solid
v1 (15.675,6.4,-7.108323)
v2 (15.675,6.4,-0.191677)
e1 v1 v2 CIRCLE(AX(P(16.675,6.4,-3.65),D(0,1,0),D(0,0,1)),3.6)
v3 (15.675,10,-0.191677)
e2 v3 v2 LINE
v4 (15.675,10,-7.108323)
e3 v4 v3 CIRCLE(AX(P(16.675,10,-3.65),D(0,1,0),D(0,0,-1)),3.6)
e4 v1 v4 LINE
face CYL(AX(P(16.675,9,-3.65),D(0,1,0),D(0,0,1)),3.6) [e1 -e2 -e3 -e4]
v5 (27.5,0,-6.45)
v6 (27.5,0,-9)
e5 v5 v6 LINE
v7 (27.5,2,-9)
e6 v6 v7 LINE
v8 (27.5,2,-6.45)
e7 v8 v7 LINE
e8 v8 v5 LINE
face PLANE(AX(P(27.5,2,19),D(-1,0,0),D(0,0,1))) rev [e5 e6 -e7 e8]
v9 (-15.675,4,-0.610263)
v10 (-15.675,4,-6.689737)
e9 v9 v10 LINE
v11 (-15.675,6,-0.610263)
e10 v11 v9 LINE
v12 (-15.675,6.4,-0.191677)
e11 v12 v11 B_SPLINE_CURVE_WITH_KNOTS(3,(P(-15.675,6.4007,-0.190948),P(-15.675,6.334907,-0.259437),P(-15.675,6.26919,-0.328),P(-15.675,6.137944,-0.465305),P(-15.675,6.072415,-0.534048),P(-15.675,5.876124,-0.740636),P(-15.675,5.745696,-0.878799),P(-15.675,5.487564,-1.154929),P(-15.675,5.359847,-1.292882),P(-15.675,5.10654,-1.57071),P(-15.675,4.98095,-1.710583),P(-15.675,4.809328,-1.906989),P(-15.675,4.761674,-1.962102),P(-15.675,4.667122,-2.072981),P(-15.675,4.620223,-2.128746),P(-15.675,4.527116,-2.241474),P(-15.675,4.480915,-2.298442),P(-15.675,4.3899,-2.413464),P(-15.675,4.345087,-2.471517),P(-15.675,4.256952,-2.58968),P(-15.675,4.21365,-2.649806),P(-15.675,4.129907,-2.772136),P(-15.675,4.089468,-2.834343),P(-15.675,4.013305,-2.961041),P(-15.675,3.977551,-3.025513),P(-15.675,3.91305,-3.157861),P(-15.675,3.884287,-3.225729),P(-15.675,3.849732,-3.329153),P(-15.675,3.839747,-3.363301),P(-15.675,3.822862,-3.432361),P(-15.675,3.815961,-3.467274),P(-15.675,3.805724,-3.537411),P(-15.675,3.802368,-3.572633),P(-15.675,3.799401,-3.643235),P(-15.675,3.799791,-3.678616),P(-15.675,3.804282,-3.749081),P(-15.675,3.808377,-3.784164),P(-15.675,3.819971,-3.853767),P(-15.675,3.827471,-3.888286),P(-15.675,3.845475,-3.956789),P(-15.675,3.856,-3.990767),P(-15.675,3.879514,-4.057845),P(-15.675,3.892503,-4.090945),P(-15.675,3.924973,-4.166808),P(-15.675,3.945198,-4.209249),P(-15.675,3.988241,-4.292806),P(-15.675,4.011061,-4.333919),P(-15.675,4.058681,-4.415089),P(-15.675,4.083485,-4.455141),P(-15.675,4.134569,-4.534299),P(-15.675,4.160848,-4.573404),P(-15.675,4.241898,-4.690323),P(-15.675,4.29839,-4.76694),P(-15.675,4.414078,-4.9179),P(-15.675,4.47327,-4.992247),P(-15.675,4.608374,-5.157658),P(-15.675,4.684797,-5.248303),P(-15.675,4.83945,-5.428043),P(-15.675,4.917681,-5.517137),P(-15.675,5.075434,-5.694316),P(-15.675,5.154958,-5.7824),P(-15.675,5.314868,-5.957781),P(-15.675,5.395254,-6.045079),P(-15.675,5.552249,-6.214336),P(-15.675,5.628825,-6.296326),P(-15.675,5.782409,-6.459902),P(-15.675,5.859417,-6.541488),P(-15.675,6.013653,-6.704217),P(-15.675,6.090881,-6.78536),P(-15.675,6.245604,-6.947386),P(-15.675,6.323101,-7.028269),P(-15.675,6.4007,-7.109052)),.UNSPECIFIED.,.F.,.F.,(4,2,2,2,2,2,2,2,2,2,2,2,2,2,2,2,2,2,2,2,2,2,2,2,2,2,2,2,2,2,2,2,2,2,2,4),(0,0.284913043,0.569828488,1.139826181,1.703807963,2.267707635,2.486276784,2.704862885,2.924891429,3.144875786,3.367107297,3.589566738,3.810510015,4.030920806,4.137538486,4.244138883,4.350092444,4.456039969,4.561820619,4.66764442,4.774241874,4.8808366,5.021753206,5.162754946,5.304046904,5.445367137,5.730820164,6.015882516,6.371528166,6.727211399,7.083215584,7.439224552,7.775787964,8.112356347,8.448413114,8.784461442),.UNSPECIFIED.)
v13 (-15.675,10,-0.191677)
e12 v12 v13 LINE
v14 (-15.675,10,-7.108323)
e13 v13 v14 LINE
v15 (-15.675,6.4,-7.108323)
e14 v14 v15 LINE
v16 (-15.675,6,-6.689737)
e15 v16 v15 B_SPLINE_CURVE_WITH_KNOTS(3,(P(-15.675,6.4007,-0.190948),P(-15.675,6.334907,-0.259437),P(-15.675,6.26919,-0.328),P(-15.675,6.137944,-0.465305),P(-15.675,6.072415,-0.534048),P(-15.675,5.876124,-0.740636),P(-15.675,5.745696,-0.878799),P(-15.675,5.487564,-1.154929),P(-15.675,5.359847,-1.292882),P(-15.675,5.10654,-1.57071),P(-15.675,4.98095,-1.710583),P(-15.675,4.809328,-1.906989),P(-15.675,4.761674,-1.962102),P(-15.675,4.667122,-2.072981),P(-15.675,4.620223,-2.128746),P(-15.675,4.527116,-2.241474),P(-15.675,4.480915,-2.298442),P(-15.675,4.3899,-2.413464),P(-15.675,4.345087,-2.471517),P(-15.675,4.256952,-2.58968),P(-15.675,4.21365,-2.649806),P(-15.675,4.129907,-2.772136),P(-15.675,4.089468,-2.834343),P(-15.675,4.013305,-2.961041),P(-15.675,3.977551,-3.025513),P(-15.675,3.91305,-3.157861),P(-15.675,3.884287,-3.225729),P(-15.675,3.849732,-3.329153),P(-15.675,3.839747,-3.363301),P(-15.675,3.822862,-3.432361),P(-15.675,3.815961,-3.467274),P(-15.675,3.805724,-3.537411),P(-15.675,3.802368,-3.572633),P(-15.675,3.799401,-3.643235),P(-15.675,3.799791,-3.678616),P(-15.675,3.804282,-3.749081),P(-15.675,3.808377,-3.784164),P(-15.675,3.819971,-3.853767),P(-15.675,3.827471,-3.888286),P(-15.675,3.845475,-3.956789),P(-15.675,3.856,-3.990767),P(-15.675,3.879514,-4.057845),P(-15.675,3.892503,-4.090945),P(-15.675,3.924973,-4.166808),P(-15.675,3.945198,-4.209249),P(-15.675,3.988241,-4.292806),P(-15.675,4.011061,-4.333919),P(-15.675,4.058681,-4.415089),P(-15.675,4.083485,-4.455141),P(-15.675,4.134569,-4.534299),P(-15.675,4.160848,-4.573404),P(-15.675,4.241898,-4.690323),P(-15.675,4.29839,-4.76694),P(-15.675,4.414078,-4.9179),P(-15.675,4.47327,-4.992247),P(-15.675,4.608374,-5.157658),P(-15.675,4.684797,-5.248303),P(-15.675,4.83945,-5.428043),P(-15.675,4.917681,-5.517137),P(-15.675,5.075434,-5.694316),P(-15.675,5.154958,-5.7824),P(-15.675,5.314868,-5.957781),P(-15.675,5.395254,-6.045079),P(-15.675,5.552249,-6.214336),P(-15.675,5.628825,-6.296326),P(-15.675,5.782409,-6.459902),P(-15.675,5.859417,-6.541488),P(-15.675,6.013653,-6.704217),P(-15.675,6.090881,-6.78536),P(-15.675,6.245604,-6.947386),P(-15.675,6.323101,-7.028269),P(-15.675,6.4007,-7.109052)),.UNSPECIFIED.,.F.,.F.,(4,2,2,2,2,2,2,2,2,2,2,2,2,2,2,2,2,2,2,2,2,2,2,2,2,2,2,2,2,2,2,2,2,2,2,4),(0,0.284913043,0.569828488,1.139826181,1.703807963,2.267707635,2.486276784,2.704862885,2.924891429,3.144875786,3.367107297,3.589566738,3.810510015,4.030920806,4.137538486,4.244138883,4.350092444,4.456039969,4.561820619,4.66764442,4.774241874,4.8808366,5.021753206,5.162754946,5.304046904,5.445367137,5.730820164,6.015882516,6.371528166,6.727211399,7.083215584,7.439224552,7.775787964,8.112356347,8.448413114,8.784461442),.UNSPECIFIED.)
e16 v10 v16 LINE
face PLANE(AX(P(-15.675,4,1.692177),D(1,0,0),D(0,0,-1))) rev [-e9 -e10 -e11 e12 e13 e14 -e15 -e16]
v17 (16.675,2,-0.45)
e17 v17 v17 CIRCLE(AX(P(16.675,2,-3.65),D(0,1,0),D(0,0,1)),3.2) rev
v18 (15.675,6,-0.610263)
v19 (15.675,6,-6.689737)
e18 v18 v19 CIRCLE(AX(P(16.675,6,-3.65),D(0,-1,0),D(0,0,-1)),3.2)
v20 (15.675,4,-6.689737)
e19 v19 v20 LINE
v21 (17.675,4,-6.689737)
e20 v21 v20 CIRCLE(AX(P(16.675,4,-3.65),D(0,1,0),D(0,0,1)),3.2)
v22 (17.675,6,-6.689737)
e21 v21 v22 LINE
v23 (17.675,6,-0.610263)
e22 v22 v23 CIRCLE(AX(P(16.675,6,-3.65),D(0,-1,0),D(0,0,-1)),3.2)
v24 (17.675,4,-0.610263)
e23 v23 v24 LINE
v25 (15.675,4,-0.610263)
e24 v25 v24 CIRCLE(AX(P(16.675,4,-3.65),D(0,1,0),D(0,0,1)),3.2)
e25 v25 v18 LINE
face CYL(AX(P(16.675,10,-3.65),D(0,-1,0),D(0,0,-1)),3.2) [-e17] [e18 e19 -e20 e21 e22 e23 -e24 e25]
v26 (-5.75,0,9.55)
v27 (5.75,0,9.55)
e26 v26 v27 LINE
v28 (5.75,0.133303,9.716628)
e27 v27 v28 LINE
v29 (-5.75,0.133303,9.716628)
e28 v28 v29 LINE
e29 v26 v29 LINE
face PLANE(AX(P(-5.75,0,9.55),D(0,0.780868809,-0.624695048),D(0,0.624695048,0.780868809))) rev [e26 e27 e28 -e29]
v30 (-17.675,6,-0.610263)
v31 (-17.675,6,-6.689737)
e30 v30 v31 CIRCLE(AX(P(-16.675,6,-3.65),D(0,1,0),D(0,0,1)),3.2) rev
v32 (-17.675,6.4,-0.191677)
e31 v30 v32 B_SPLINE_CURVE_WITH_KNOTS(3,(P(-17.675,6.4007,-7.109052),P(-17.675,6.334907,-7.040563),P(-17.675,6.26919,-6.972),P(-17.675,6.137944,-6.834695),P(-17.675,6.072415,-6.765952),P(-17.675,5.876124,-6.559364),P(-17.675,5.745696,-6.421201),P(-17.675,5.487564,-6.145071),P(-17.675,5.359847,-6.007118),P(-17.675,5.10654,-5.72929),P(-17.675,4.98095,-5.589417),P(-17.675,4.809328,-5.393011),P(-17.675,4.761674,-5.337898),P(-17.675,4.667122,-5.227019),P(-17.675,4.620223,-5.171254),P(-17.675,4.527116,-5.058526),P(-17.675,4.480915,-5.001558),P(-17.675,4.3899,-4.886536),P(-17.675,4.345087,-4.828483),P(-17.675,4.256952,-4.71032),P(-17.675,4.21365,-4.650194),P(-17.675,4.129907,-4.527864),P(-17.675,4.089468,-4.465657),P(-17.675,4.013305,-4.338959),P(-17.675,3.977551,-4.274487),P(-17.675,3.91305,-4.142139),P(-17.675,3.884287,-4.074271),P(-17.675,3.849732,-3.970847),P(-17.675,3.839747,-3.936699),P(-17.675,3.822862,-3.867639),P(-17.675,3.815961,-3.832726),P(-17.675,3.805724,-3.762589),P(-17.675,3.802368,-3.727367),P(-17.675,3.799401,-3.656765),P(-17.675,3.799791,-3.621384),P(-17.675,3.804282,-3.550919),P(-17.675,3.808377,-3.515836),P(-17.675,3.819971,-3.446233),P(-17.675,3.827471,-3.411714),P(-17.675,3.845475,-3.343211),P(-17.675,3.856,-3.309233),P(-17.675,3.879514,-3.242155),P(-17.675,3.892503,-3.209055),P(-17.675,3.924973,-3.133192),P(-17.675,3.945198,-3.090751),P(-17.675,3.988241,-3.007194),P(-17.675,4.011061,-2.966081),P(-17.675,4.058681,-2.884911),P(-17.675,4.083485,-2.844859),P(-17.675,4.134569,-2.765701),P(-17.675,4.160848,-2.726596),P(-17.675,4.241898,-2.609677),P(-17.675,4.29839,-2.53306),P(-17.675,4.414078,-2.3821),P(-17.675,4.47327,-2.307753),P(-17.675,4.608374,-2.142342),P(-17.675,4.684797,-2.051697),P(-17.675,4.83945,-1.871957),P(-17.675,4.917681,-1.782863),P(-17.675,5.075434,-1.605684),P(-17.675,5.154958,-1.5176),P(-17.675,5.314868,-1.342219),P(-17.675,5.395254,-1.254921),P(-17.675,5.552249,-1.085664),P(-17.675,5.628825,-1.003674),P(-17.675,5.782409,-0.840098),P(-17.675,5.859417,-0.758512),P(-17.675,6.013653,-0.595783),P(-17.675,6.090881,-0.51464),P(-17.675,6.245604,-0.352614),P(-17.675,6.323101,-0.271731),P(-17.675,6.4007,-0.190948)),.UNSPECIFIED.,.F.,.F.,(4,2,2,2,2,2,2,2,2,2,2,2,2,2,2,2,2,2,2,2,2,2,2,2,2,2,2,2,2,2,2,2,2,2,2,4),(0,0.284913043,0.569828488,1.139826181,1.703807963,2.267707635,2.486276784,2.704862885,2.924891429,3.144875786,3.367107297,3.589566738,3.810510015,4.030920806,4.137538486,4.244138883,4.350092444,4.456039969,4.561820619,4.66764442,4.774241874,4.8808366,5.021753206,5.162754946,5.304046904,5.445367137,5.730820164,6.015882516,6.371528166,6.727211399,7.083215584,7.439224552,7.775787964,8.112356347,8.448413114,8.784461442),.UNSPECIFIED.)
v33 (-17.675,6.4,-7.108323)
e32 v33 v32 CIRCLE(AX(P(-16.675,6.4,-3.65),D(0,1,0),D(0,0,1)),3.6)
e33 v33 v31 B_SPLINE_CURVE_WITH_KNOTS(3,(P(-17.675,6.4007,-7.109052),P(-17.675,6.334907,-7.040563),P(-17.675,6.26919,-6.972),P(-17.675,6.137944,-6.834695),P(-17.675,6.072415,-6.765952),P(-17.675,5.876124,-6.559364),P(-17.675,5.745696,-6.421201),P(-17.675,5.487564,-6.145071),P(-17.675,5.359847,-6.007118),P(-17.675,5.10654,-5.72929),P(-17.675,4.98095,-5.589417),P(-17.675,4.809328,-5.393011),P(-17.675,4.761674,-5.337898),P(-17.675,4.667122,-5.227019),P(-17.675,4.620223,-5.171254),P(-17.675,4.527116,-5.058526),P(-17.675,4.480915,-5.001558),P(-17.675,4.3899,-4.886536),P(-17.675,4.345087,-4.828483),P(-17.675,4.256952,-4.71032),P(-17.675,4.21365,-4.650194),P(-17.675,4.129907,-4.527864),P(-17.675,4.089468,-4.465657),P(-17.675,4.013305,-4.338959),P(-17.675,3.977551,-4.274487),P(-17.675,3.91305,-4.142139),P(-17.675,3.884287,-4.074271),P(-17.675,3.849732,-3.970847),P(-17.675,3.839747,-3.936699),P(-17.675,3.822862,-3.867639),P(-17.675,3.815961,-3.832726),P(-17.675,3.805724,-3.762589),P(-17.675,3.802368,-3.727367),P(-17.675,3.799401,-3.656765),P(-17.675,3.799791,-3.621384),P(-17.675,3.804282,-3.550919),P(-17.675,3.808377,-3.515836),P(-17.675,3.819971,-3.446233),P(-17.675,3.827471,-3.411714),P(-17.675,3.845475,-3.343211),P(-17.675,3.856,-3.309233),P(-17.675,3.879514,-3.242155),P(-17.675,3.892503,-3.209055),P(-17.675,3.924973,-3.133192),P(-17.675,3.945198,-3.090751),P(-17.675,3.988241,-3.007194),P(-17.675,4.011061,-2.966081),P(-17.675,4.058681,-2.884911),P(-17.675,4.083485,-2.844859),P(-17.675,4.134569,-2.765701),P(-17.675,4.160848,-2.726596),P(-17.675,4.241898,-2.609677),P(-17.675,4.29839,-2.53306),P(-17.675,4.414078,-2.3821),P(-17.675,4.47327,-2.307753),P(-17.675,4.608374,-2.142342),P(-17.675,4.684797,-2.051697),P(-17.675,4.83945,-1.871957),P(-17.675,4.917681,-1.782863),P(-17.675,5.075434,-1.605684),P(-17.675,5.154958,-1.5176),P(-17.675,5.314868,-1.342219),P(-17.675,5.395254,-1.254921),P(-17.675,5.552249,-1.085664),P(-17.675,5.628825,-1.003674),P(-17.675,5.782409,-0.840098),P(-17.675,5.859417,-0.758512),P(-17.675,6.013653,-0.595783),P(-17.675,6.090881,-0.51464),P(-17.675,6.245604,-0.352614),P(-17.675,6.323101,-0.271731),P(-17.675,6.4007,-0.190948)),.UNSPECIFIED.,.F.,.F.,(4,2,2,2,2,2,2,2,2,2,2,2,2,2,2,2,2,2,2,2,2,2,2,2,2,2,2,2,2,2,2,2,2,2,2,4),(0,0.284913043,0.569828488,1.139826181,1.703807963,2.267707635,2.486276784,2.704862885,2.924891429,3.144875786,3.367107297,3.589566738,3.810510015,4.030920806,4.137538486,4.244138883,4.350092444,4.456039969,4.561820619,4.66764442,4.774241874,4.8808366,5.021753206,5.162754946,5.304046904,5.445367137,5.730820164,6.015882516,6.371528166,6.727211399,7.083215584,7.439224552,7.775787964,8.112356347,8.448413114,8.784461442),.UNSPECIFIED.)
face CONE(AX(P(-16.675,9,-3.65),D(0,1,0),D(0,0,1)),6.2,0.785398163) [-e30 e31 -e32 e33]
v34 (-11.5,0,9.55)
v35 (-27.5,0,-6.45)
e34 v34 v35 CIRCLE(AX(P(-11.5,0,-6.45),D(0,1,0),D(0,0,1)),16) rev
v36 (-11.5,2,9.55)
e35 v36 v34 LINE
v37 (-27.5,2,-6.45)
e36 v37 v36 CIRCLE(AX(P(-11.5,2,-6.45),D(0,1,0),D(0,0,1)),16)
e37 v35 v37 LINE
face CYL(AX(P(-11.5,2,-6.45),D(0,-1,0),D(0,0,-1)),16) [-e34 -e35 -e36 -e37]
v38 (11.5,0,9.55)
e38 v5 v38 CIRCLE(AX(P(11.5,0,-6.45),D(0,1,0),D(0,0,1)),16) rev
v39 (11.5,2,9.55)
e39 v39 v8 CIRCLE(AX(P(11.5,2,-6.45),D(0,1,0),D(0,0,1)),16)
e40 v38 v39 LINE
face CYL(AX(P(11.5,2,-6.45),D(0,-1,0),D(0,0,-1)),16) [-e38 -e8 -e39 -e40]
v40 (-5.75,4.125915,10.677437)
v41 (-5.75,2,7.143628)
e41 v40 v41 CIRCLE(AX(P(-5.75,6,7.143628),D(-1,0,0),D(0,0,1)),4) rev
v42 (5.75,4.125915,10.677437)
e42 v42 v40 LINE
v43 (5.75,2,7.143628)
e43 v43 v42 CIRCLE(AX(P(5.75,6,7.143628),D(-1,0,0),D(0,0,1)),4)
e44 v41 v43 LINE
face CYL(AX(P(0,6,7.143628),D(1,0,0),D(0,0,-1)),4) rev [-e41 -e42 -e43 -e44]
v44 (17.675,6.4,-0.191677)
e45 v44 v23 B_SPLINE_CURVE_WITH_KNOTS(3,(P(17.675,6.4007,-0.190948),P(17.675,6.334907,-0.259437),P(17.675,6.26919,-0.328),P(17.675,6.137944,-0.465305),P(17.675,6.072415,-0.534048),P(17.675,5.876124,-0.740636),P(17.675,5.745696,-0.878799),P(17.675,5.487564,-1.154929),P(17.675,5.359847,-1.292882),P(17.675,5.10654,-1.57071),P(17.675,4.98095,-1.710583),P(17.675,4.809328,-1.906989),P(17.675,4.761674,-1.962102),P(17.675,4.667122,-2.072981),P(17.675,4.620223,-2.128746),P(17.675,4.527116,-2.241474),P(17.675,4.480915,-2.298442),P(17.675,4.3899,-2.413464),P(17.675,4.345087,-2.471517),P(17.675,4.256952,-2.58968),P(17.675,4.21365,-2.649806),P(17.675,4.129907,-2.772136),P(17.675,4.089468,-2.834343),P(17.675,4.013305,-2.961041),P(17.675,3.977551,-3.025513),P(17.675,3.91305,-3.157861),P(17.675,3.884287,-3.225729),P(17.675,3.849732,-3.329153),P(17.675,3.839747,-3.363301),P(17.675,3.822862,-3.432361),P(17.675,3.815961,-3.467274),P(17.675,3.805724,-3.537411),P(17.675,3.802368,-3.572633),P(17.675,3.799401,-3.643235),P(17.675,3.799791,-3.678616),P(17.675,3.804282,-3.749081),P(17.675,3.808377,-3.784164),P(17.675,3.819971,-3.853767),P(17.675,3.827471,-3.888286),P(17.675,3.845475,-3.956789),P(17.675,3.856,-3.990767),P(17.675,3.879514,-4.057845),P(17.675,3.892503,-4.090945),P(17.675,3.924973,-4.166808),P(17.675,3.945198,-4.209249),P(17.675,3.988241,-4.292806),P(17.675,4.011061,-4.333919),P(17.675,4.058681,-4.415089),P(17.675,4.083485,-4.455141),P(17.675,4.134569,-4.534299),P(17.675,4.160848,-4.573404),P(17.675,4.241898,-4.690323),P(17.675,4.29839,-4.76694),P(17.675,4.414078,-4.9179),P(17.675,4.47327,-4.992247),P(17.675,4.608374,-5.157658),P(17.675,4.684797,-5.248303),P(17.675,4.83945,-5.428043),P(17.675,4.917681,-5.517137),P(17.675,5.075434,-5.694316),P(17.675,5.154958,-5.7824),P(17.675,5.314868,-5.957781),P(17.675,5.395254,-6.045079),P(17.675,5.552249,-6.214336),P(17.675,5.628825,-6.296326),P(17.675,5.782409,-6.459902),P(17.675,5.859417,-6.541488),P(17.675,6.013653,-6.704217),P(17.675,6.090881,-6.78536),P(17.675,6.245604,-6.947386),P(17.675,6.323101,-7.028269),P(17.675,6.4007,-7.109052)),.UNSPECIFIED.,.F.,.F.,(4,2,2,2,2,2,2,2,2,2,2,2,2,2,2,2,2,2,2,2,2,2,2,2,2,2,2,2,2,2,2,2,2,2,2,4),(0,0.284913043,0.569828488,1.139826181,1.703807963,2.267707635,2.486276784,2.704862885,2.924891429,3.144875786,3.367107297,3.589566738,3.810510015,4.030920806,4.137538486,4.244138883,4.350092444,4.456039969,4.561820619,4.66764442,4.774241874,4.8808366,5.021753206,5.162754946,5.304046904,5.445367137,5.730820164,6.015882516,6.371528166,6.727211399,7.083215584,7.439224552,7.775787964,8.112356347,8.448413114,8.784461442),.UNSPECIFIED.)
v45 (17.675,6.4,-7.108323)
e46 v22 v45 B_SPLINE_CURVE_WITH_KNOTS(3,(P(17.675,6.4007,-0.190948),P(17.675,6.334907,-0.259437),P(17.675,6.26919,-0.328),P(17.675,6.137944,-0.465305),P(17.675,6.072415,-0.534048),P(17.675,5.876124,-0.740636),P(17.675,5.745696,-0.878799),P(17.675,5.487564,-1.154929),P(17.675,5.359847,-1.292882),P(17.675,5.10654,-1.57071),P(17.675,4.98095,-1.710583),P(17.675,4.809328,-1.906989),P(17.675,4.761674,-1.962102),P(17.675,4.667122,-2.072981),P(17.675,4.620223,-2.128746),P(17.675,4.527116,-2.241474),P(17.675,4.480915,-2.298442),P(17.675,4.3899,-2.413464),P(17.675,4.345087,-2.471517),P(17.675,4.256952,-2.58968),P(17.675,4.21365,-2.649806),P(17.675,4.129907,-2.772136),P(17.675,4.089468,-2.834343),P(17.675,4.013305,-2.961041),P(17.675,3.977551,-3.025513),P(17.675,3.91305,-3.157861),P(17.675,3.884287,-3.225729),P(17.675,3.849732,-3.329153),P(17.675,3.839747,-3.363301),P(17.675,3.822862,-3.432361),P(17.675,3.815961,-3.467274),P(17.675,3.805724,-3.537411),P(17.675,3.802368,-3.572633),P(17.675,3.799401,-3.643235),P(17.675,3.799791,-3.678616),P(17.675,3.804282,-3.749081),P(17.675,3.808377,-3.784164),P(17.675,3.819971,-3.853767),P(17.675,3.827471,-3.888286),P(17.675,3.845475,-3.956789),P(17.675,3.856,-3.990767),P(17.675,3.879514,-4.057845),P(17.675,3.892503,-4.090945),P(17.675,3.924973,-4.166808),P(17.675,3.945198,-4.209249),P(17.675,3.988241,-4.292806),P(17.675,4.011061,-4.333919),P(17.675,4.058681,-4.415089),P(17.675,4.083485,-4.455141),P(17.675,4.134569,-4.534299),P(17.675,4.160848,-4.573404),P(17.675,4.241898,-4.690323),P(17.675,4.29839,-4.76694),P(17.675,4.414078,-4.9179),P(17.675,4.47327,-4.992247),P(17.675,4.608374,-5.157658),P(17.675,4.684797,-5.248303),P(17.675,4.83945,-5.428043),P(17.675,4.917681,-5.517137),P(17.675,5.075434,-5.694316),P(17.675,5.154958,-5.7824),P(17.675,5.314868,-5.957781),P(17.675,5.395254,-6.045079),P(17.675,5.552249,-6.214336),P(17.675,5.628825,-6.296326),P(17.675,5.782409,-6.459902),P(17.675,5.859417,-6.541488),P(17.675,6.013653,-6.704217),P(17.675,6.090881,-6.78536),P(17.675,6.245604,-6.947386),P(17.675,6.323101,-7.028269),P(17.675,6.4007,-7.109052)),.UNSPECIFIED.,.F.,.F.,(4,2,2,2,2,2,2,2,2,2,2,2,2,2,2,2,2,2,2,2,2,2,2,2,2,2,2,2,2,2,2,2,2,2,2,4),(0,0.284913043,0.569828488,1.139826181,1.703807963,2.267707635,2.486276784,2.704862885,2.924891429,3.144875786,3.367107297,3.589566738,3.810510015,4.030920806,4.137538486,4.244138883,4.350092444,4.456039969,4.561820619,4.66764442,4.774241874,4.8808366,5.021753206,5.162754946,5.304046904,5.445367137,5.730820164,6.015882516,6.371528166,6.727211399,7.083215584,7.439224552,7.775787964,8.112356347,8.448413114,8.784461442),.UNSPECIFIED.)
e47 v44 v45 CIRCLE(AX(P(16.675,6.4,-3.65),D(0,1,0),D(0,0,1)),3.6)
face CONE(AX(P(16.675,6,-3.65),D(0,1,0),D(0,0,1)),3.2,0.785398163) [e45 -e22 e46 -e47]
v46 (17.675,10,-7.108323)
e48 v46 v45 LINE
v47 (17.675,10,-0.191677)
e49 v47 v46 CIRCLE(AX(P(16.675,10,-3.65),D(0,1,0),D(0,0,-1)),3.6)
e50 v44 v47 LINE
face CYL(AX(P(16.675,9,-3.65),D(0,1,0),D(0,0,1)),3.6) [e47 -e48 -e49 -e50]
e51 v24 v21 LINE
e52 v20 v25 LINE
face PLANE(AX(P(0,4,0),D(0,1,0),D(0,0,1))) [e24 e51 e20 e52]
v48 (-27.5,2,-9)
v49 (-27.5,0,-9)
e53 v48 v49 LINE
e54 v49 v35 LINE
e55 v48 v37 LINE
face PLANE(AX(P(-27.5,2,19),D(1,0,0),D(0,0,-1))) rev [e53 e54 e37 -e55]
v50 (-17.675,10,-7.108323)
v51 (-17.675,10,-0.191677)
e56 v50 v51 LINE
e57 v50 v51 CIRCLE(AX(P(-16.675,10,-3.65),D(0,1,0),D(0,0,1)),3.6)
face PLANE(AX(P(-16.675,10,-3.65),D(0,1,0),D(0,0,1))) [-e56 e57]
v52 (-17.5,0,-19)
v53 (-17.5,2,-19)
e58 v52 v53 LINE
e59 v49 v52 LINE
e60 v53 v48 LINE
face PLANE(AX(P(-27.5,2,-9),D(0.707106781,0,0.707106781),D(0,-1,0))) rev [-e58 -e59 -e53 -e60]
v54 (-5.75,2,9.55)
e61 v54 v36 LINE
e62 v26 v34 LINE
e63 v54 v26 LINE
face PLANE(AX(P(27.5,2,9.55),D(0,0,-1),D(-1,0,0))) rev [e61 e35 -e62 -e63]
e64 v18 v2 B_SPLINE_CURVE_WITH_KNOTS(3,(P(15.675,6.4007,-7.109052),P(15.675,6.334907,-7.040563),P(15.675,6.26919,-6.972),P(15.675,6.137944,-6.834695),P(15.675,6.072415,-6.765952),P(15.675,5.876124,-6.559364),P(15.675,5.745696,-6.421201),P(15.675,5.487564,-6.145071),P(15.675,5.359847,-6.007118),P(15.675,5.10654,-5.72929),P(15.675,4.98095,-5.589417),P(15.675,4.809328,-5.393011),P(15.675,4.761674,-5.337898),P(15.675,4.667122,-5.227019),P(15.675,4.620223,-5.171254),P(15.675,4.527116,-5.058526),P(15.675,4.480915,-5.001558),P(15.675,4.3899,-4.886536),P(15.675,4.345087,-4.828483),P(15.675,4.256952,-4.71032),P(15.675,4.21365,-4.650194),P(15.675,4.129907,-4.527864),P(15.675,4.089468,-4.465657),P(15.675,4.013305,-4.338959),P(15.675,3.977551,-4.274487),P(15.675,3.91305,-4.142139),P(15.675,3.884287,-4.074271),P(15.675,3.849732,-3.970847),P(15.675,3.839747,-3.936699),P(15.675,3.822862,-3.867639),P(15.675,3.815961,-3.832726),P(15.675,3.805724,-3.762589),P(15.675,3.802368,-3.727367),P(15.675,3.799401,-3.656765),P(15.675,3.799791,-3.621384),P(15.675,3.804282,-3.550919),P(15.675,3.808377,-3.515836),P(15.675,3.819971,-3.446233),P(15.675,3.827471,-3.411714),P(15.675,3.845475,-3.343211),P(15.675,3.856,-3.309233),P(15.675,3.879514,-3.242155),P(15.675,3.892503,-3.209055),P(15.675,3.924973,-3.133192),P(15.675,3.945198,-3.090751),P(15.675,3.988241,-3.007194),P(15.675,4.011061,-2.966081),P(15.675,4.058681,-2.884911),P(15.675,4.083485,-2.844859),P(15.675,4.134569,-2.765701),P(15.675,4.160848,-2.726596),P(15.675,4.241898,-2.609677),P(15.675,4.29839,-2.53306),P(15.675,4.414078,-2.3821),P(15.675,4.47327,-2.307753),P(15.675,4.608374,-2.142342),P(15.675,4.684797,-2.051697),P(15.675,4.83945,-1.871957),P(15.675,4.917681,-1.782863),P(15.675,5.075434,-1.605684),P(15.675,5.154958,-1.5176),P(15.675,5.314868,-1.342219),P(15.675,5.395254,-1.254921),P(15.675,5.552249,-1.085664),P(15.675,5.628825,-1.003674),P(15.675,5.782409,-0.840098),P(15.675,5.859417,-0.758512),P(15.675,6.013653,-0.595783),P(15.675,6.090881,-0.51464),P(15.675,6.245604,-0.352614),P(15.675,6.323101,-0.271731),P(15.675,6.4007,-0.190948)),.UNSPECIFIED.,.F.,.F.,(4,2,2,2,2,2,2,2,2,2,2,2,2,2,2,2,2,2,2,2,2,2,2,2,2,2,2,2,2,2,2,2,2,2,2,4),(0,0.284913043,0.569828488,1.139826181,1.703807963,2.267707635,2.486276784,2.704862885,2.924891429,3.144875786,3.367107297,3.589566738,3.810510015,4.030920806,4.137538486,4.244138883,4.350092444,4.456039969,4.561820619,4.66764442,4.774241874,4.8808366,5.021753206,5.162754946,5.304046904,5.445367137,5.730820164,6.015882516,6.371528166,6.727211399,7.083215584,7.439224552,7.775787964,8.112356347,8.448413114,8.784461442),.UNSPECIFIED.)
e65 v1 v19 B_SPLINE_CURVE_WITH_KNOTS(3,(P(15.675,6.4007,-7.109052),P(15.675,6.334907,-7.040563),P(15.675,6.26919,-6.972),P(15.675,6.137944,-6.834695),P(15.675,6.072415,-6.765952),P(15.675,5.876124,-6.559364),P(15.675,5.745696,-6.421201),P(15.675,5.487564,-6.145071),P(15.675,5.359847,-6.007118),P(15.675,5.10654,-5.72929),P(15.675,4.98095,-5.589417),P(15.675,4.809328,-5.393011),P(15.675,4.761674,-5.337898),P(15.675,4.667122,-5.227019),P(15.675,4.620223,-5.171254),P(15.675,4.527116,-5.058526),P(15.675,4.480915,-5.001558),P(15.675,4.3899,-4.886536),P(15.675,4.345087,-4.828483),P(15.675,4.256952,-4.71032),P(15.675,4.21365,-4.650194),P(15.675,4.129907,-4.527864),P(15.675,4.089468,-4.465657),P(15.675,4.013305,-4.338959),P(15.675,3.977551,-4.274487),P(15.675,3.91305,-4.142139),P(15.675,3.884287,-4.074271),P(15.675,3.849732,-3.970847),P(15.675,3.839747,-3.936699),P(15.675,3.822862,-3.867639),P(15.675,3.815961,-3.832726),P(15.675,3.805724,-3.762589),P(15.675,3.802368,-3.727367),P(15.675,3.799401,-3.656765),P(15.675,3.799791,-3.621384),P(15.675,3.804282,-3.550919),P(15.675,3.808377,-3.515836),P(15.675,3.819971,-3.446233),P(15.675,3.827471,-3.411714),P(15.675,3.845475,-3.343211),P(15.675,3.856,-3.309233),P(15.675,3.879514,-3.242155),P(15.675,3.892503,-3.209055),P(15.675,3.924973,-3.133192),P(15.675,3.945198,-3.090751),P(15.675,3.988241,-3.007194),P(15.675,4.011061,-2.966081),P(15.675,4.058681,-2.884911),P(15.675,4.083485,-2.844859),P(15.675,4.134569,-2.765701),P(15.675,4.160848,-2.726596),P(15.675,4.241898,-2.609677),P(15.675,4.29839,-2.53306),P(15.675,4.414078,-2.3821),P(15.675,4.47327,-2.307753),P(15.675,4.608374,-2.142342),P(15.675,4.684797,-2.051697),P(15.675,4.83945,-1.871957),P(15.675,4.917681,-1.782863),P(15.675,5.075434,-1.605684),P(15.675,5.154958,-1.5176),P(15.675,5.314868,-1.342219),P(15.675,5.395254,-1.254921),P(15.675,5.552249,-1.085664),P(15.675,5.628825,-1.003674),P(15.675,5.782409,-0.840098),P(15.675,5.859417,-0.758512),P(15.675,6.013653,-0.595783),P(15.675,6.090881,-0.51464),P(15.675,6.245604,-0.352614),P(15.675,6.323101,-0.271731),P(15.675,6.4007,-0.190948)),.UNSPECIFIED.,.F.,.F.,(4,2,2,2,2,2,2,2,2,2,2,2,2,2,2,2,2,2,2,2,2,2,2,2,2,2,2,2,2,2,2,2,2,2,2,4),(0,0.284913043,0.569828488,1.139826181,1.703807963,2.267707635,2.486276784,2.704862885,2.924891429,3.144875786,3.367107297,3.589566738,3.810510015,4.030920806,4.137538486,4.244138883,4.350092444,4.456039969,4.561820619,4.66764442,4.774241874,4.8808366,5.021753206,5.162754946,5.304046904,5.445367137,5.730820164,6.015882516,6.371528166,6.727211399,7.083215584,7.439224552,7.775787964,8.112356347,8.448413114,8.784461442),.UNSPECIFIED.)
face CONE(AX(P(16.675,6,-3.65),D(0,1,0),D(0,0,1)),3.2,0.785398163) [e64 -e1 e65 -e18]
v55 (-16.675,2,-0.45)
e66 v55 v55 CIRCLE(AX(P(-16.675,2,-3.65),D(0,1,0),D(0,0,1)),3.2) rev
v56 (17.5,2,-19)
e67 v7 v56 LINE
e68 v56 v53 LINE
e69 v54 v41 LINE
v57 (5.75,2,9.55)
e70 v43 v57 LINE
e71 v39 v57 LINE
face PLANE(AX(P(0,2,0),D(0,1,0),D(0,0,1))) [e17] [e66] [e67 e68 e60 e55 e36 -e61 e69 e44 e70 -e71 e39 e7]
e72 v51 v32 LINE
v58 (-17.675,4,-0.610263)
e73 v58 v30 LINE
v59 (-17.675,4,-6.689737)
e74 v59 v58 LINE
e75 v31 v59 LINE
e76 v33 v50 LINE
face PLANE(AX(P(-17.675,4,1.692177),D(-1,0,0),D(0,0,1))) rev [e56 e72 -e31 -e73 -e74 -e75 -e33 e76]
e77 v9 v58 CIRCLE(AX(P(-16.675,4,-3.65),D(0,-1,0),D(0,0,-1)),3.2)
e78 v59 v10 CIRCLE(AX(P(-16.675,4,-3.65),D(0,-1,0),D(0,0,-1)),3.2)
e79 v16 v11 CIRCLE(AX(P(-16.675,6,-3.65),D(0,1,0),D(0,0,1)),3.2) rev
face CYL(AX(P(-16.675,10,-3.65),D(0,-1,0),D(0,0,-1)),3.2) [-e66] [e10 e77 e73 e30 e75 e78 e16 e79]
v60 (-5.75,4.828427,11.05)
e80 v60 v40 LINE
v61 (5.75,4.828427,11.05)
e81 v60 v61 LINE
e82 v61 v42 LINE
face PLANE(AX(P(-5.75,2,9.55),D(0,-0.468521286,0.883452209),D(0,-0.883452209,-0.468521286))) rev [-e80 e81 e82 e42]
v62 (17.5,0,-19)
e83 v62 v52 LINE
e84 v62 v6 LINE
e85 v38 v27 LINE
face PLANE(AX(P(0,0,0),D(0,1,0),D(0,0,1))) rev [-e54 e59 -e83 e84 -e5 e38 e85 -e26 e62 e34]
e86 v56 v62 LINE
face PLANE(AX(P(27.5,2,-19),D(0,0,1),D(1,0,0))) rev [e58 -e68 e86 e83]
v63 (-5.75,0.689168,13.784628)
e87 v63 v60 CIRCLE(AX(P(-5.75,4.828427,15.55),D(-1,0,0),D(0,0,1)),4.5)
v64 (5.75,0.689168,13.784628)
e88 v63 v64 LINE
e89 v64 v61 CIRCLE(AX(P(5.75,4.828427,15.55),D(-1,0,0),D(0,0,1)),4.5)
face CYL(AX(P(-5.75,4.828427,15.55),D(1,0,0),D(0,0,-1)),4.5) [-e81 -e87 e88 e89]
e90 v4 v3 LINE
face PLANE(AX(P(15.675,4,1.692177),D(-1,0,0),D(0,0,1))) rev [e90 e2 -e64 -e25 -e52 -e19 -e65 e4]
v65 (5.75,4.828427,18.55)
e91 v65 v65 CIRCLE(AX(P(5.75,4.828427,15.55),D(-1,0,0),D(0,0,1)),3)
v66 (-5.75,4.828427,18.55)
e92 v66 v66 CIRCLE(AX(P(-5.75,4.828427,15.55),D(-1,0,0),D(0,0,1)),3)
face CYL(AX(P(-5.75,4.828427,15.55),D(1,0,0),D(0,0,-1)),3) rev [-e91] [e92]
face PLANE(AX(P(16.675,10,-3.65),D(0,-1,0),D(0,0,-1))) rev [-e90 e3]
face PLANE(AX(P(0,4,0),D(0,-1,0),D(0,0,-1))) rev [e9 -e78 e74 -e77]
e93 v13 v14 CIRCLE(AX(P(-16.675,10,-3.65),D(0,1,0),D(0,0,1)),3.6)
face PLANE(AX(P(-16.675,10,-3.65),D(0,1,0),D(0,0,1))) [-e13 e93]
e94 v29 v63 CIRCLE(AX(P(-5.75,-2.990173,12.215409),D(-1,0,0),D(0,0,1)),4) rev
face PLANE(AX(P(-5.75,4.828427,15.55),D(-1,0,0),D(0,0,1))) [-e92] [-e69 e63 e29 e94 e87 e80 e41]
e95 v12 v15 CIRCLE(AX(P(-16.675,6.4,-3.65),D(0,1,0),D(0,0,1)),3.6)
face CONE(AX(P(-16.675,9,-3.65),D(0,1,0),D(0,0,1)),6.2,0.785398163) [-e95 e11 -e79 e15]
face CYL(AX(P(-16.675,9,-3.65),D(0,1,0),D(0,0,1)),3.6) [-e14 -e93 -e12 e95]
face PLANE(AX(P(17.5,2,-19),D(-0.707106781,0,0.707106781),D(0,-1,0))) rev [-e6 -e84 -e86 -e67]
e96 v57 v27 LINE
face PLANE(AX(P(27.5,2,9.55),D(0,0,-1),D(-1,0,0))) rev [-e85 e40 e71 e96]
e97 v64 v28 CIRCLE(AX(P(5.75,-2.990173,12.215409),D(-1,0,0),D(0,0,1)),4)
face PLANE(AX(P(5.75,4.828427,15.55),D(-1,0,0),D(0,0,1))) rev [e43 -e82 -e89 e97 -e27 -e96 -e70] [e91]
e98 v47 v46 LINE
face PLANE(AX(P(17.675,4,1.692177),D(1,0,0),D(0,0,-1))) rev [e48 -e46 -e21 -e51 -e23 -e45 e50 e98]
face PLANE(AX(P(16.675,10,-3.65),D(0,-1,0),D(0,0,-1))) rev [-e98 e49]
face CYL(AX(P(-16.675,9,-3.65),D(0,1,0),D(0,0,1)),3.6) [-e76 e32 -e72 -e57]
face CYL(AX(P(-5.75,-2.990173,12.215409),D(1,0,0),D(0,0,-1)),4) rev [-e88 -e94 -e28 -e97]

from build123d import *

# Parameters (mm, degrees)
SKETCH2_W               = 55
SKETCH2_H               = 38
BOSS_EXTRUDE1_DEPTH     = 2
SKETCH3_R               = 3.2
BOSS_EXTRUDE2_DEPTH     = 10
SKETCH4_R               = 3.6
BOSS_EXTRUDE3_DEPTH     = 1
CHAMFER1_SIZE           = 3
SKETCH5_W               = 2
SKETCH5_H               = 10.684354826
CUT_EXTRUDE1_DEPTH      = 6
CHAMFER2_SIZE           = 10
CUT_EXTRUDE2_DEPTH      = 35.889110049
CUT_EXTRUDE2_DEPTH_BACK = 35.889110049
SKETCH8_W               = 9.45
SKETCH8_H               = 2
SKETCH9_R               = 3
BOSS_EXTRUDE4_DEPTH     = 5.75
FILLET1_R               = 4
FILLET2_R               = 16


with BuildPart() as part:
    # Sketch2 → Boss-Extrude1 (new body)
    with BuildSketch(Plane(origin=(0, 0, 0), x_dir=(1, 0, 0), z_dir=(0, 1, 0))):
        Rectangle(SKETCH2_W, SKETCH2_H)
    extrude(amount=BOSS_EXTRUDE1_DEPTH)

    # Sketch3 → Boss-Extrude2 (add)
    with BuildSketch(Plane(origin=(0, 0, 0), x_dir=(1, 0, 0), z_dir=(0, 1, 0))):
        with Locations(Location((-16.675, 3.65, 0), (0, 0, 270))):
            Circle(SKETCH3_R)
        with Locations(Location((16.675, 3.65, 0), (0, 0, 90))):
            Circle(SKETCH3_R)
    extrude(amount=BOSS_EXTRUDE2_DEPTH)

    # Sketch4 → Boss-Extrude3 (add)
    with BuildSketch(Plane(origin=(0, 10, 0), x_dir=(1, 0, 0), z_dir=(0, 1, 0))):
        with Locations(Location((-16.675, 3.65, 0), (0, 0, 270))):
            Circle(SKETCH4_R)
        with Locations(Location((16.675, 3.65, 0), (0, 0, 90))):
            Circle(SKETCH4_R)
    extrude(amount=-BOSS_EXTRUDE3_DEPTH)

    # Chamfer1
    # the kernel refuses this chamfer: 3 mm, written as the material it adds along each edge
    with BuildSketch(Plane(origin=(16.675, 9, -3.65), x_dir=(0, 0, -1), z_dir=(-1, 0, 0))) as chamfer1_piece_1_section:
        Polygon((3.2, CHAMFER1_SIZE), (3.2 + CHAMFER1_SIZE, 0), (3.2, 0), align=None)
    chamfer1_piece_1 = revolve(axis=Axis((16.675, 9, -3.65), (0, -1, 0)), mode=Mode.PRIVATE)
    chamfer1_piece_1 = chamfer1_piece_1 & Plane(origin=(16.675, 6.179265151, -3.65), x_dir=(0, 0, -1), z_dir=(0, 1, 0)) * Cylinder(3.6, 25, mode=Mode.PRIVATE)
    add(chamfer1_piece_1)
    with BuildSketch(Plane(origin=(-16.675, 9, -3.65), x_dir=(0, 0, 1), z_dir=(1, 0, 0))) as chamfer1_piece_2_section:
        Polygon((3.2, CHAMFER1_SIZE), (3.2 + CHAMFER1_SIZE, 0), (3.2, 0), align=None)
    chamfer1_piece_2 = revolve(axis=Axis((-16.675, 9, -3.65), (0, -1, 0)), mode=Mode.PRIVATE)
    chamfer1_piece_2 = chamfer1_piece_2 & Plane(origin=(-16.675, 6.179265151, -3.65), x_dir=(0, 0, 1), z_dir=(0, 1, 0)) * Cylinder(3.6, 25, mode=Mode.PRIVATE)
    add(chamfer1_piece_2)

    # Sketch5 → Cut-Extrude1 (cut)
    with BuildSketch(Plane(origin=(0, 10, 0), x_dir=(1, 0, 0), z_dir=(0, 1, 0))):
        with Locations((16.675, 3.65)):
            Rectangle(SKETCH5_W, SKETCH5_H)
        with Locations((-16.675, 3.65)):
            Rectangle(SKETCH5_W, SKETCH5_H)
    extrude(amount=-CUT_EXTRUDE1_DEPTH, mode=Mode.SUBTRACT)

    # Chamfer2
    chamfer2_edges = [part.edges().sort_by_distance(p)[0] for p in [
        (-27.5, 1, -19),
        (27.5, 1, -19),
    ]]
    chamfer(chamfer2_edges, length=CHAMFER2_SIZE)

    # Sketch8 → Cut-Extrude2 (cut, two sides: drawn at the far end of the back side and taken through both)
    with BuildSketch(Plane.ZY.offset(-CUT_EXTRUDE2_DEPTH_BACK)):
        with Locations((14.275, 1)):
            Rectangle(SKETCH8_W, SKETCH8_H)
    extrude(amount=CUT_EXTRUDE2_DEPTH + CUT_EXTRUDE2_DEPTH_BACK, mode=Mode.SUBTRACT)

    # Sketch9 → Boss-Extrude4 (add, symmetric)
    with BuildSketch(Plane.ZY):
        with BuildLine():
            Line((9.55, 2), (11.05, 4.828427125))
            ThreePointArc((11.05, 4.828427125), (19.792640687, 6.328427125), (12.05, 2))
            Line((12.05, 2), (9.55, 0))
            Line((9.55, 0), (9.55, 2))
        make_face()
        with Locations((15.55, 4.828427125)):
            Circle(SKETCH9_R, mode=Mode.SUBTRACT)
    extrude(amount=BOSS_EXTRUDE4_DEPTH, both=True)

    # Fillet1
    fillet1_edges = [part.edges().sort_by_distance(p)[0] for p in [
        (0, 2, 9.55),
        (0, 2, 12.05),
    ]]
    fillet(fillet1_edges, radius=FILLET1_R)

    # Fillet2
    fillet2_edges = [part.edges().sort_by_distance(p)[0] for p in [
        (27.5, 1, 9.55),
        (-27.5, 1, 9.55),
    ]]
    fillet(fillet2_edges, radius=FILLET2_R)


solid = part.part
